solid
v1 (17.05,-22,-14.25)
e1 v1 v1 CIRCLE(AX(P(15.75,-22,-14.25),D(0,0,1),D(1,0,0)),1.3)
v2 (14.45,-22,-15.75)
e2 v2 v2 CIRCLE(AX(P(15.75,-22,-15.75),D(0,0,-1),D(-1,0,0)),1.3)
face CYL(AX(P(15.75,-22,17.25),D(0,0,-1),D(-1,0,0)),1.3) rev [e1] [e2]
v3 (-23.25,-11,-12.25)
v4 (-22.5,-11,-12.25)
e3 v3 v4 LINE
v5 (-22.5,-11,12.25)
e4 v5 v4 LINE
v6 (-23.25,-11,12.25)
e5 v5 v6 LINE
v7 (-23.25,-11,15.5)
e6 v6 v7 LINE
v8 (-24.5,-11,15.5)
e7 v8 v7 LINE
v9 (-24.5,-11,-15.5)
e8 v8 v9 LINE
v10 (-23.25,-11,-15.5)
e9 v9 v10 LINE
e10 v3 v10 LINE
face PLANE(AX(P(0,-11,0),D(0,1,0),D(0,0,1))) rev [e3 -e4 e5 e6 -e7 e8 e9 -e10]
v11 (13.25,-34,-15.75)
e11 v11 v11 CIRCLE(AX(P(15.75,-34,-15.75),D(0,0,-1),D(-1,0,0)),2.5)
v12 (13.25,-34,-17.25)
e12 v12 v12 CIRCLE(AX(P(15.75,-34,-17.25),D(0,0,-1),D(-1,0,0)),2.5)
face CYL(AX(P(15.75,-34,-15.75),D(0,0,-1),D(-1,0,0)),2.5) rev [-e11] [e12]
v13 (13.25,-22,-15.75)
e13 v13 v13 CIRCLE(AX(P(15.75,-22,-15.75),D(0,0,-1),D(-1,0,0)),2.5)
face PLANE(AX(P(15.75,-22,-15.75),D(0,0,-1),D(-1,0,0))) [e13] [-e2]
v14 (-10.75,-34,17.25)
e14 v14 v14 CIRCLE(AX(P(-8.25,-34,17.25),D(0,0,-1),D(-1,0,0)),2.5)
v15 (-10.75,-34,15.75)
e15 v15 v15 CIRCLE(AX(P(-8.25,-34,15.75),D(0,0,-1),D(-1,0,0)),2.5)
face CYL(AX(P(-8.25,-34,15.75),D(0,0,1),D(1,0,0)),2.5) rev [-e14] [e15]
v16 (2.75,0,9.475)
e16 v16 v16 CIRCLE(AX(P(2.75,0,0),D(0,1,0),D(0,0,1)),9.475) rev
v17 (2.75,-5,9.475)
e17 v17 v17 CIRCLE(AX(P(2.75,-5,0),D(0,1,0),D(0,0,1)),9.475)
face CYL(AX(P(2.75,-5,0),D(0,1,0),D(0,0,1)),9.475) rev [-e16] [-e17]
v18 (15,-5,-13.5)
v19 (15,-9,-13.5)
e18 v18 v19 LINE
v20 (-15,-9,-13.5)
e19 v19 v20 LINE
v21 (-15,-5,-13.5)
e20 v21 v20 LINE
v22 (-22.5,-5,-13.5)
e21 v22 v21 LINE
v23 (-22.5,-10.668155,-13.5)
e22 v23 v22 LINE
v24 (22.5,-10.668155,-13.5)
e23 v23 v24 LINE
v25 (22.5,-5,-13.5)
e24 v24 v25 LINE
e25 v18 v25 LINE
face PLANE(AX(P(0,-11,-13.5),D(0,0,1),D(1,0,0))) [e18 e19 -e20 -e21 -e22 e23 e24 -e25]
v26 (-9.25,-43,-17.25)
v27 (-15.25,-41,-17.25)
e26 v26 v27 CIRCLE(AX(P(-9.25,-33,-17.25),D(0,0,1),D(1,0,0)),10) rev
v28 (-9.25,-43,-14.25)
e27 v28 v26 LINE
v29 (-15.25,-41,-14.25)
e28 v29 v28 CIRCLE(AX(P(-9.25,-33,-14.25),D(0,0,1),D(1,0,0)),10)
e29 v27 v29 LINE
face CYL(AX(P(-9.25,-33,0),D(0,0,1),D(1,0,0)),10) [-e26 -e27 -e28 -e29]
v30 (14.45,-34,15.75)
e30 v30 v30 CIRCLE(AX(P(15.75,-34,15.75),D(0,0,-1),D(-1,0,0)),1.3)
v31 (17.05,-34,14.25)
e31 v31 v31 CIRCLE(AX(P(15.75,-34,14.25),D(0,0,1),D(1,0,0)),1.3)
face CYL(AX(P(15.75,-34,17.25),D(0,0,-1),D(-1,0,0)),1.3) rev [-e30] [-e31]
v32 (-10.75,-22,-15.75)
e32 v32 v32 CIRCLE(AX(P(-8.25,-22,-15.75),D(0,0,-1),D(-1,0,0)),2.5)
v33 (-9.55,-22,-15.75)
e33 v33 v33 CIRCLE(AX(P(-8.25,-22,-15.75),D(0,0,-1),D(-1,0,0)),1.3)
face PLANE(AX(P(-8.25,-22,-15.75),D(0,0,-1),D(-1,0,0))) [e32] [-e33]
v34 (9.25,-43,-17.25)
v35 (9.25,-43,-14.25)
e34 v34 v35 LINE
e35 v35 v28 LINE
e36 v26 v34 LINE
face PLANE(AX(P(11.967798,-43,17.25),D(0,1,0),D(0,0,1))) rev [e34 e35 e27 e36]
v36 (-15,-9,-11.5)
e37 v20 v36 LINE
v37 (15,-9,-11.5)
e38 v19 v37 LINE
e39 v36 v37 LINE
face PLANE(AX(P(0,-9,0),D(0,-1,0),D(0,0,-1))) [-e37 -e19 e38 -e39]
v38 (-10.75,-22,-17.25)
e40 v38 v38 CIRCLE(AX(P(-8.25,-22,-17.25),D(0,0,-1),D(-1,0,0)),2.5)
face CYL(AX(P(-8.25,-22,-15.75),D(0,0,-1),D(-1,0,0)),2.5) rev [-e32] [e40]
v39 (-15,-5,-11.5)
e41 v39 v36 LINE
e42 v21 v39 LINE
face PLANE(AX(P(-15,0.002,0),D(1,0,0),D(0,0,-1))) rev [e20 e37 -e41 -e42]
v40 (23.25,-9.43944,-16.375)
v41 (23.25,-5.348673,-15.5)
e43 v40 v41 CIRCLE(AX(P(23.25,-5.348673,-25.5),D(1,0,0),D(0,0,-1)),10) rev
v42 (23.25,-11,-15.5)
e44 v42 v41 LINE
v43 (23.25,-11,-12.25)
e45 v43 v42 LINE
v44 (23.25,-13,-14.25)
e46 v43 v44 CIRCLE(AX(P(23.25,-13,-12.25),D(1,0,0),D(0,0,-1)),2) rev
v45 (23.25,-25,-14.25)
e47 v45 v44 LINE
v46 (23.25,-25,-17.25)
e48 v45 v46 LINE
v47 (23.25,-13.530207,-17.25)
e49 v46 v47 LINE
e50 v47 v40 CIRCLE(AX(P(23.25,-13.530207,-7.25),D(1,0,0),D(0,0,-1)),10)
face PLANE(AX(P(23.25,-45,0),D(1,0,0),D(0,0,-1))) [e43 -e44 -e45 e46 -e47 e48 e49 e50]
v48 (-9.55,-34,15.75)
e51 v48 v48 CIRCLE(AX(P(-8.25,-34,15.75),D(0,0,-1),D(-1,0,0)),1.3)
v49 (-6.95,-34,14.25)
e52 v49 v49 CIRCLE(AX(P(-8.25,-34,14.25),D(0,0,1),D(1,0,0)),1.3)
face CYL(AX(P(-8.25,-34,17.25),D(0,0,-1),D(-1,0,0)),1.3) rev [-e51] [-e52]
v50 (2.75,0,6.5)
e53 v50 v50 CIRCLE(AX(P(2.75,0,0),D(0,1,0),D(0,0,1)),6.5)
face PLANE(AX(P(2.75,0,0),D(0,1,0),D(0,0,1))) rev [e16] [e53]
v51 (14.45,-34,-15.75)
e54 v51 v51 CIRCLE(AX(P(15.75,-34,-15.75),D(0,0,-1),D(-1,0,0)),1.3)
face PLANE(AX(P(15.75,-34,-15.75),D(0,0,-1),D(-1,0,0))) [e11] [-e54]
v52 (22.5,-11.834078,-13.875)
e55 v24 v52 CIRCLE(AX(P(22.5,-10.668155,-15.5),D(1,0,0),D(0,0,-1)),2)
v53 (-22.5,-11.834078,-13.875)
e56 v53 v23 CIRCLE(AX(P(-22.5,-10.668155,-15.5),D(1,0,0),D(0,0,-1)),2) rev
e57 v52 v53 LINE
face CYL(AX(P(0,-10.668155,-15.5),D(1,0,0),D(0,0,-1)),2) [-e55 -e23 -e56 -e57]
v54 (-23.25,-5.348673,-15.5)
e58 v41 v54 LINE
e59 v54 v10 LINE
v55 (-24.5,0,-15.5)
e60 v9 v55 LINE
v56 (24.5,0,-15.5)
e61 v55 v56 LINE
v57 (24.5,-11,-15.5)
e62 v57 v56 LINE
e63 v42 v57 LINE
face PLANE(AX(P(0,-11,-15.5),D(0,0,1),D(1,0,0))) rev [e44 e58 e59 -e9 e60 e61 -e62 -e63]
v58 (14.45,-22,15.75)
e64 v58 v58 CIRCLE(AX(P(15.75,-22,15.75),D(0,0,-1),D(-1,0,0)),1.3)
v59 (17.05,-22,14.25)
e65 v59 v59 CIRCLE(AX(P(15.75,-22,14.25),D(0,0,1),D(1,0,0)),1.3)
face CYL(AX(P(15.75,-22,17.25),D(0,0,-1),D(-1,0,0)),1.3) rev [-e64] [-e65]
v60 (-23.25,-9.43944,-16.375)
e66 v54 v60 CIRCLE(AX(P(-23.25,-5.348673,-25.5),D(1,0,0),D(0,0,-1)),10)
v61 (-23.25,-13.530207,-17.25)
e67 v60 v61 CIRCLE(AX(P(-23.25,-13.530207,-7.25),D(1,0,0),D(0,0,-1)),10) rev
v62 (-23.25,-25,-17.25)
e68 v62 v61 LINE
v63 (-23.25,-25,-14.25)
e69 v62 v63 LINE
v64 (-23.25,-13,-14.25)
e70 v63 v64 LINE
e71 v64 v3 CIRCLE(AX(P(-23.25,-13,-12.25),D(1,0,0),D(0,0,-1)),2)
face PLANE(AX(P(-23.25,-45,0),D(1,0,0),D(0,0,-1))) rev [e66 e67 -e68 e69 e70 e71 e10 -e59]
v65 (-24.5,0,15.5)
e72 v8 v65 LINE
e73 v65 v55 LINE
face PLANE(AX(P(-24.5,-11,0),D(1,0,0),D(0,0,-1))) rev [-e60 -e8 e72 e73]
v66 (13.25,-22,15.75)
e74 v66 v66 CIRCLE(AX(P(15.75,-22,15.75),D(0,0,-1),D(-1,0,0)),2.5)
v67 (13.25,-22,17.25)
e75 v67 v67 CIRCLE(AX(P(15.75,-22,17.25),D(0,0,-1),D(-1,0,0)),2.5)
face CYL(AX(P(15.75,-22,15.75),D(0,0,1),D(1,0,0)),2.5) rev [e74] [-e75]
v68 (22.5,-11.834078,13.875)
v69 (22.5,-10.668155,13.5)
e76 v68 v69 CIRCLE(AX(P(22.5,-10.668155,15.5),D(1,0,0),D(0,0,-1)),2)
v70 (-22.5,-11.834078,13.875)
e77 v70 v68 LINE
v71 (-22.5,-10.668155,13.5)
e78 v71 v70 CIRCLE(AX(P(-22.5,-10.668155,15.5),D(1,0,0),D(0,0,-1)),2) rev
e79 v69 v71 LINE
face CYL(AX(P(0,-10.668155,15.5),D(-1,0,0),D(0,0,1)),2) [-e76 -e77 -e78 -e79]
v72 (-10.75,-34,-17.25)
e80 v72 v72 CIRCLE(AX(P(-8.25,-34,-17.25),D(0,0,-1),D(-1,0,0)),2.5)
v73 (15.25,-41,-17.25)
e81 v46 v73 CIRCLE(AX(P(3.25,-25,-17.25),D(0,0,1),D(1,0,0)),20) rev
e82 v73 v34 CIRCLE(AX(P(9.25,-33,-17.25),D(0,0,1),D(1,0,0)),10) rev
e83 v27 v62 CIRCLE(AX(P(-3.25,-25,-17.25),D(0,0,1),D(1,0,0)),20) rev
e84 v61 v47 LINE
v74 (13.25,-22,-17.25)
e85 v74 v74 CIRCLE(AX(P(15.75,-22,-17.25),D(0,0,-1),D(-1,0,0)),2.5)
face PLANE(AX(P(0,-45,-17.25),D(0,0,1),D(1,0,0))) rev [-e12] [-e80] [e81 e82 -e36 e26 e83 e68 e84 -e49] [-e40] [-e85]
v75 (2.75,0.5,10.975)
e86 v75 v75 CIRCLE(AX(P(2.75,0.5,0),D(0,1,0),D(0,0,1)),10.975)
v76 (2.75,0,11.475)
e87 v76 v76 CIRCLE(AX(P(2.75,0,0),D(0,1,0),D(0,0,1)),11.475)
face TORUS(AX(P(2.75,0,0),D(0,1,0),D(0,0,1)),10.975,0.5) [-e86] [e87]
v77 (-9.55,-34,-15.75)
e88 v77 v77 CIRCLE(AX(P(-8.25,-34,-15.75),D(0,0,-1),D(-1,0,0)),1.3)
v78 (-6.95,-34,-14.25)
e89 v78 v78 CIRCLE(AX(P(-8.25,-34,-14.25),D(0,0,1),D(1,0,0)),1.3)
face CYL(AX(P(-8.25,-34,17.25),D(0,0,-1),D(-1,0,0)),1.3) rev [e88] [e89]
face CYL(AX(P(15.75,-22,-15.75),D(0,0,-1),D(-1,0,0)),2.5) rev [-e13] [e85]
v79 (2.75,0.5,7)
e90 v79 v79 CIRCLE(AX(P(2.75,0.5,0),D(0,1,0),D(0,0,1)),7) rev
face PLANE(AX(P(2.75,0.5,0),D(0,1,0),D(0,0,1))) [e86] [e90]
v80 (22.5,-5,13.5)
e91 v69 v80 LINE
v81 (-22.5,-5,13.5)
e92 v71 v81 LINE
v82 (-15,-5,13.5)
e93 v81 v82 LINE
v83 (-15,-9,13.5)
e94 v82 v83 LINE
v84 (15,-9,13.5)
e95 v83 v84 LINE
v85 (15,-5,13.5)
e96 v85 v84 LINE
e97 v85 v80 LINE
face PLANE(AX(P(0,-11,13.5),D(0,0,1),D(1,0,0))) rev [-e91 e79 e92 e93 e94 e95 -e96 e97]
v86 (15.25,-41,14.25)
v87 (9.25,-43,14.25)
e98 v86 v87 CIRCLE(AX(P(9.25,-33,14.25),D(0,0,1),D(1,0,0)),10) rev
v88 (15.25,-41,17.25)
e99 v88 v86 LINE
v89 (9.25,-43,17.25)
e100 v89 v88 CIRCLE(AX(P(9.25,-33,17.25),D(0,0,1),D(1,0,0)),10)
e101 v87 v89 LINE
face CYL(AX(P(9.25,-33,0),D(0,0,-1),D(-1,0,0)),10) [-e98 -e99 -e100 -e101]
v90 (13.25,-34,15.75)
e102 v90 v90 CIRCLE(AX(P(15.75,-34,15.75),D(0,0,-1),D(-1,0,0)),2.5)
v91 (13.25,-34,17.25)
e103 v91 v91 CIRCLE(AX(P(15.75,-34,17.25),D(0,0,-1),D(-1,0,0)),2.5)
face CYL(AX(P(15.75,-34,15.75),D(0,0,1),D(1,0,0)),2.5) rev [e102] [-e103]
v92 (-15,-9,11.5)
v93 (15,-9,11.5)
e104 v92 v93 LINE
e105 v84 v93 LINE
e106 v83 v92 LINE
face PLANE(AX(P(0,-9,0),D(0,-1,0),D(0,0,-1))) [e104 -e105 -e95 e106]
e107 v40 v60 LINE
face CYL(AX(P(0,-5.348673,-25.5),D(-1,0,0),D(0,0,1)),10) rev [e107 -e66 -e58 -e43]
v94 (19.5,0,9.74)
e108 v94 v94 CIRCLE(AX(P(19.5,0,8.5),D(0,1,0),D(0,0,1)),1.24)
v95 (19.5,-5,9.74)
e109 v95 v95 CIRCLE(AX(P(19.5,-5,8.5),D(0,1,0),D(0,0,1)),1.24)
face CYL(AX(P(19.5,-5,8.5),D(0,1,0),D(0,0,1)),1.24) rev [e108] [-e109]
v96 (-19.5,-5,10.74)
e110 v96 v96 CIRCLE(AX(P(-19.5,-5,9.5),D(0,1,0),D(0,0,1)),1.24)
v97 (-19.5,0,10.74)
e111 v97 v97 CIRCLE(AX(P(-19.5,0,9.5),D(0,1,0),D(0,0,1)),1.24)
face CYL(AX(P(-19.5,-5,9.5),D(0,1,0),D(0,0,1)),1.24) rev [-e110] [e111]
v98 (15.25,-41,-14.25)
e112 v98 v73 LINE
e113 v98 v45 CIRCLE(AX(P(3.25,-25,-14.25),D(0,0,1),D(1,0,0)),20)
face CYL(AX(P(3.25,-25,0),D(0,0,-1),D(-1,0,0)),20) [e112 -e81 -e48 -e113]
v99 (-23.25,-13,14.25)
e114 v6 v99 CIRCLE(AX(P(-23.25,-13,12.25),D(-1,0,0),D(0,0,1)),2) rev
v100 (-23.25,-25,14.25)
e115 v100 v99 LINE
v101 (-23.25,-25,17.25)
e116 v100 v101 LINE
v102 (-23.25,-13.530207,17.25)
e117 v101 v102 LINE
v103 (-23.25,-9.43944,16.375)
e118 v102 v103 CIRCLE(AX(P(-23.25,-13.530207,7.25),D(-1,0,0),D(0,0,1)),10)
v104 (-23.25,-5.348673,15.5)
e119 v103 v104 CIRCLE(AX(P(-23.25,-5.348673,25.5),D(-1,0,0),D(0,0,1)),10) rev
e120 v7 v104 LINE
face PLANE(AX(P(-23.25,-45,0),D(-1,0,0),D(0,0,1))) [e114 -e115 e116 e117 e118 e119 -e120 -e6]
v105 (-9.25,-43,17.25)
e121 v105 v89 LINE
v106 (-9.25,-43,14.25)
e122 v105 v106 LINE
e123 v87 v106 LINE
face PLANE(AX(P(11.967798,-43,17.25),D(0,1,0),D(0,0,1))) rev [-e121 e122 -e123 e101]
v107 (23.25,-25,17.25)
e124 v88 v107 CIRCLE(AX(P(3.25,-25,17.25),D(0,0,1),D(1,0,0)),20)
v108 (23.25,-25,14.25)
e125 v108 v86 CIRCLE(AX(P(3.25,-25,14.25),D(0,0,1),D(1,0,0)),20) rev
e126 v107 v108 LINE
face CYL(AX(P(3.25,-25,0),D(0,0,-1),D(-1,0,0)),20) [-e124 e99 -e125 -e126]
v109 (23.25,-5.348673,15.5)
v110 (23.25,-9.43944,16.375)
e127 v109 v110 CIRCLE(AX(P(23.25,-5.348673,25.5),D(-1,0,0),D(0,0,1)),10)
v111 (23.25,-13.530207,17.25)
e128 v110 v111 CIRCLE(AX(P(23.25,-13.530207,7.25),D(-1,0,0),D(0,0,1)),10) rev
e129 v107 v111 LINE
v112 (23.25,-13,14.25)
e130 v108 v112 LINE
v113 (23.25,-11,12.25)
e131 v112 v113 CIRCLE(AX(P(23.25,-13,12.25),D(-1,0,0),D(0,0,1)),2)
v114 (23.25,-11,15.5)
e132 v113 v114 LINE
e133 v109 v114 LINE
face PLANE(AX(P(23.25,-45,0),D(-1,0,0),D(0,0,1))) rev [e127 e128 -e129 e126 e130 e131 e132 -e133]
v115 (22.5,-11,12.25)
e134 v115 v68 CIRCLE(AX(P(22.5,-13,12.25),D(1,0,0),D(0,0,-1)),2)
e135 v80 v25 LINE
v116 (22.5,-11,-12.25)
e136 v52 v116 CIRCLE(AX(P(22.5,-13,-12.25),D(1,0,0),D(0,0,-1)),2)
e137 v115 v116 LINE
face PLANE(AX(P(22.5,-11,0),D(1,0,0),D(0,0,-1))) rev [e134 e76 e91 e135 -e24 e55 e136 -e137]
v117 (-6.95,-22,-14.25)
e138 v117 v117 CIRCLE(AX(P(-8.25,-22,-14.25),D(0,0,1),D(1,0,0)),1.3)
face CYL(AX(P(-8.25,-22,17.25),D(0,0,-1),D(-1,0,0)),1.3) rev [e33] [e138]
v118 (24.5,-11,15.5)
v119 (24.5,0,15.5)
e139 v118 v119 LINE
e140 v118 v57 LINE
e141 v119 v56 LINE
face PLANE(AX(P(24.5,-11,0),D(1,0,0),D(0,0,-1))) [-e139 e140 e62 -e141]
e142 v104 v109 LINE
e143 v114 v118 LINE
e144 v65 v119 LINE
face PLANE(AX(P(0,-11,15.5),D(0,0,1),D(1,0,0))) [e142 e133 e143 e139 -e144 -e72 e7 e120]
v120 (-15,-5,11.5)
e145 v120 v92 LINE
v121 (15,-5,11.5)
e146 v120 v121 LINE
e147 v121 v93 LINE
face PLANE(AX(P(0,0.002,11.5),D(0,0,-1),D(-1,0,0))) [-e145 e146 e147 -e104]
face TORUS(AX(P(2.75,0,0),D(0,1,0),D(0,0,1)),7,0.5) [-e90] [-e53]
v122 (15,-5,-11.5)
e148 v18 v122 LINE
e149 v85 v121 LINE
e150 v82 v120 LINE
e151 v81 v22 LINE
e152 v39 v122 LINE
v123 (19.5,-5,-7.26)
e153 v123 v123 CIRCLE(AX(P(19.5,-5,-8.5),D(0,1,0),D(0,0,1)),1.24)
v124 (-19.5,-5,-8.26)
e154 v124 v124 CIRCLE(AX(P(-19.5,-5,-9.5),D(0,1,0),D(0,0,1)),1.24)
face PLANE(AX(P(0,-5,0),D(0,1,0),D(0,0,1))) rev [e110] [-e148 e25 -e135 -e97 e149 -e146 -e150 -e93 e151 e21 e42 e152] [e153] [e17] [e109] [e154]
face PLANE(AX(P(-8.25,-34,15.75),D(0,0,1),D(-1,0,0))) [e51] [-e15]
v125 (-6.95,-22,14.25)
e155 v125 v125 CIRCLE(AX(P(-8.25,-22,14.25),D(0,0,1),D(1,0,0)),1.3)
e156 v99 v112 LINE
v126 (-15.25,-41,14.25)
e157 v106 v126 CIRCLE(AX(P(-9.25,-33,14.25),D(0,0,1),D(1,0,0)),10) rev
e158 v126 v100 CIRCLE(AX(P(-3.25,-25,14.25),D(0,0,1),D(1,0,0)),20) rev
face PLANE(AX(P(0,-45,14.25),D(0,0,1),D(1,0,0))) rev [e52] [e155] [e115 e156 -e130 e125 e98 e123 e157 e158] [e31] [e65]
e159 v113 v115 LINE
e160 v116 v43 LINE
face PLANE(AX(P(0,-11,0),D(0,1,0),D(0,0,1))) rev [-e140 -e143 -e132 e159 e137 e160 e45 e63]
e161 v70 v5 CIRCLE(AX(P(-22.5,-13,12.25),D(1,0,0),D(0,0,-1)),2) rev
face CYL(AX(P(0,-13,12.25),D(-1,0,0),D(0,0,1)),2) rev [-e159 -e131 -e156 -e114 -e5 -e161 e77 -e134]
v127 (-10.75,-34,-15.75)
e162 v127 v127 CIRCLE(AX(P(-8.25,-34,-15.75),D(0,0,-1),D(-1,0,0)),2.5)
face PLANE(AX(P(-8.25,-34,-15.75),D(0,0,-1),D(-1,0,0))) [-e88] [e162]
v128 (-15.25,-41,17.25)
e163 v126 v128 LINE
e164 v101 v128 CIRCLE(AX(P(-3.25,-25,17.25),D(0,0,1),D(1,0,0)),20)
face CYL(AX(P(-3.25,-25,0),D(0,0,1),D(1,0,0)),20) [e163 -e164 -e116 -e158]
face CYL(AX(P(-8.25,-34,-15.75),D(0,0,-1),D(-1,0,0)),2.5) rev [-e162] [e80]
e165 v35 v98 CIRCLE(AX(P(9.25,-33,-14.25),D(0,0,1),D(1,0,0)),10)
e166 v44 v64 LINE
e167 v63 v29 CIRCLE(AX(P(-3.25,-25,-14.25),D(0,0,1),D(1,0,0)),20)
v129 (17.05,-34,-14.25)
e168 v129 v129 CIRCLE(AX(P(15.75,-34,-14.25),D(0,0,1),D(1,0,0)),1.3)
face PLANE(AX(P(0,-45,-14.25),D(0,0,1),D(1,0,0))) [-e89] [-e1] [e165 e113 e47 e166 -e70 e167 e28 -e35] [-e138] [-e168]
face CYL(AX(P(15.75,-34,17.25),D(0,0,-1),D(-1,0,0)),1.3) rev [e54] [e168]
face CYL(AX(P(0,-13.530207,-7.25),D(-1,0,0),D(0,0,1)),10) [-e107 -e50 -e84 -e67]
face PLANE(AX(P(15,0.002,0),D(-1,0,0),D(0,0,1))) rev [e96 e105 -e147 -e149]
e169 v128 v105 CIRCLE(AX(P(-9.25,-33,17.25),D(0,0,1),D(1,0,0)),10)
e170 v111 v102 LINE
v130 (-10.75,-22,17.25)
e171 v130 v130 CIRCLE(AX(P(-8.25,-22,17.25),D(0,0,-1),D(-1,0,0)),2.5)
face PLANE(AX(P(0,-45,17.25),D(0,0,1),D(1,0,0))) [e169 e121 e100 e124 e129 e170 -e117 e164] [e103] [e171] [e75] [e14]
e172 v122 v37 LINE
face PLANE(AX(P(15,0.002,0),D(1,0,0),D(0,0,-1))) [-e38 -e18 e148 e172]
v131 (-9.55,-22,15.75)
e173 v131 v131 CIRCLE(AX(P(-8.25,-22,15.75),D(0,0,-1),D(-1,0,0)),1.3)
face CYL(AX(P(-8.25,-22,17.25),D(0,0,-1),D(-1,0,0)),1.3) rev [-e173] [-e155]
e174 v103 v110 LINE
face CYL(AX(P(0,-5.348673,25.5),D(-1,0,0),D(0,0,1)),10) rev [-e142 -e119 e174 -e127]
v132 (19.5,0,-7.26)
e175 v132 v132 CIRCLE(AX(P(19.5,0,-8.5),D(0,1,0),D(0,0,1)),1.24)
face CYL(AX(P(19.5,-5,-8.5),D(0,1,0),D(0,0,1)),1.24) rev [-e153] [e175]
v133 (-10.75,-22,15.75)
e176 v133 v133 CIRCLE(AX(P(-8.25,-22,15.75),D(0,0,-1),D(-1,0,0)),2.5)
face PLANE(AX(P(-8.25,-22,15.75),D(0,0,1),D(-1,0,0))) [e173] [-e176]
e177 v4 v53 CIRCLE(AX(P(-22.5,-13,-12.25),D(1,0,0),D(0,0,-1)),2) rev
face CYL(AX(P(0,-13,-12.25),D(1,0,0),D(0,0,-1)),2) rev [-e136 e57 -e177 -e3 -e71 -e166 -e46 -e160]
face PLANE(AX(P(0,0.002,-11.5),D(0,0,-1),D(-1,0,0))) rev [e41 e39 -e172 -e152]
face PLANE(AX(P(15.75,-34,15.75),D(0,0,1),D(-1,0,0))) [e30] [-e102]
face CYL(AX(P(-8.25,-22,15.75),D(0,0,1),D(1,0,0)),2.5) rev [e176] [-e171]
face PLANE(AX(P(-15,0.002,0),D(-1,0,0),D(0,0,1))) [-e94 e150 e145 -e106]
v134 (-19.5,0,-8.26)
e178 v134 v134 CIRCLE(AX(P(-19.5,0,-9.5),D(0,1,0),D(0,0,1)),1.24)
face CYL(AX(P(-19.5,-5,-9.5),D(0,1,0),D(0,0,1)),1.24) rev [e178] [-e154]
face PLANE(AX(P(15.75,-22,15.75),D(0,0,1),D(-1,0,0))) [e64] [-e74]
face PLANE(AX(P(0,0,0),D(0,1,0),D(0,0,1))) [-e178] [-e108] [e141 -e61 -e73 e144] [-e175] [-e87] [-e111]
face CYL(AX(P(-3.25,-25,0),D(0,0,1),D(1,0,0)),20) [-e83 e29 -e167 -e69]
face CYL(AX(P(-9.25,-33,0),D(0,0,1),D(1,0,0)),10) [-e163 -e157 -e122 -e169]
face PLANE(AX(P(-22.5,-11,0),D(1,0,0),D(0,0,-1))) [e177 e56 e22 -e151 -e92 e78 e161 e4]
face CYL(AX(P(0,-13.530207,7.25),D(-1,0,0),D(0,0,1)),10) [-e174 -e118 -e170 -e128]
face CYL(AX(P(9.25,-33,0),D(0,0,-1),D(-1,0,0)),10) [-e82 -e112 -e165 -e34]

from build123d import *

# Parameters (mm, degrees)
SKETCH1_W           = 45
SKETCH1_H           = 27
SKETCH1_R           = 9.475
SKETCH1_R_2         = 1.24
BOSS_EXTRUDE1_DEPTH = 5
SKETCH1_3_W         = 49
SKETCH1_3_H         = 31
SKETCH1_3_W_2       = 45
SKETCH1_3_H_2       = 27
BOSS_EXTRUDE2_DEPTH = 11
SKETCH2_W           = 46.5
SKETCH2_H           = 1.75
SKETCH2_H_2         = 1.25
BOSS_EXTRUDE3_DEPTH = 34
BOSS_EXTRUDE4_REACH = 49.319
BOSS_EXTRUDE4_START = -2
SKETCH2_4_W         = 30
SKETCH2_4_H         = 2
SKETCH3_R           = 1.3
CUT_EXTRUDE2_DEPTH  = 62.769733689
SKETCH3_3_R         = 2.5
SKETCH3_3_R_2       = 1.3
CUT_EXTRUDE3_DEPTH  = 1.5
FILLET3_R           = 10
FILLET4_R           = 10
FILLET5_R           = 2
FILLET6_R           = 2
FILLET7_R           = 20
SKETCH4_R           = 11.475
SKETCH4_R_2         = 6.5
BOSS_EXTRUDE5_DEPTH = 0.5
FILLET8_R           = 0.5
CUT_EXTRUDE4_DEPTH  = 62.769733689
FILLET9_R           = 10


# Some blends are built 0.0001 mm under size
with BuildPart() as part:
    # Sketch1 → Boss-Extrude1 (new body)
    with BuildSketch(Plane(origin=(0, 0, 0), x_dir=(1, 0, 0), z_dir=(0, 1, 0))):
        Rectangle(SKETCH1_W, SKETCH1_H)
        with Locations(Location((2.75, 0, 0), (0, 0, 270))):
            Circle(SKETCH1_R, mode=Mode.SUBTRACT)
        with Locations(Location((-19.5, 9.5, 0), (0, 0, 270))):
            Circle(SKETCH1_R_2, mode=Mode.SUBTRACT)
        with Locations(Location((-19.5, -9.5, 0), (0, 0, 270))):
            Circle(SKETCH1_R_2, mode=Mode.SUBTRACT)
        with Locations(Location((19.5, -8.5, 0), (0, 0, 270))):
            Circle(SKETCH1_R_2, mode=Mode.SUBTRACT)
        with Locations(Location((19.5, 8.5, 0), (0, 0, 270))):
            Circle(SKETCH1_R_2, mode=Mode.SUBTRACT)
    extrude(amount=-BOSS_EXTRUDE1_DEPTH)

    # Sketch1<3> → Boss-Extrude2 (add)
    with BuildSketch(Plane(origin=(0, 0, 0), x_dir=(1, 0, 0), z_dir=(0, 1, 0))):
        Rectangle(SKETCH1_3_W, SKETCH1_3_H)
        Rectangle(SKETCH1_3_W_2, SKETCH1_3_H_2, mode=Mode.SUBTRACT)
    extrude(amount=-BOSS_EXTRUDE2_DEPTH)

    # Sketch2 → Boss-Extrude3 (add)
    with BuildSketch(Plane.XZ.offset(11)):
        with Locations((0, 16.375)):
            Rectangle(SKETCH2_W, SKETCH2_H)
        with Locations((0, 14.875)):
            Rectangle(SKETCH2_W, SKETCH2_H_2)
        with Locations((0, -14.875)):
            Rectangle(SKETCH2_W, SKETCH2_H_2)
        with Locations((0, -16.375)):
            Rectangle(SKETCH2_W, SKETCH2_H)
    extrude(amount=BOSS_EXTRUDE3_DEPTH)

    # Sketch2<4> → Boss-Extrude4 (add, up to next)
    with BuildSketch(Plane.XZ.offset(11).offset(BOSS_EXTRUDE4_START), mode=Mode.PRIVATE) as boss_extrude4_sk1:
        with Locations((0, 12.5)):
            Rectangle(SKETCH2_4_W, SKETCH2_4_H)
    boss_extrude4_tool1 = extrude(boss_extrude4_sk1.sketch, amount=-BOSS_EXTRUDE4_REACH, mode=Mode.PRIVATE) - part.part
    # Sketch2<4> → Boss-Extrude4 (add, up to next)
    with BuildSketch(Plane.XZ.offset(11).offset(BOSS_EXTRUDE4_START), mode=Mode.PRIVATE) as boss_extrude4_sk2:
        with Locations((0, -12.5)):
            Rectangle(SKETCH2_4_W, SKETCH2_4_H)
    boss_extrude4_tool2 = extrude(boss_extrude4_sk2.sketch, amount=-BOSS_EXTRUDE4_REACH, mode=Mode.PRIVATE) - part.part
    add(boss_extrude4_tool1.solids().sort_by_distance((0, -9, 12.5))[0])
    add(boss_extrude4_tool2.solids().sort_by_distance((0, -9, -12.5))[0])

    # Sketch3 → Cut-Extrude2 (cut, through all)
    with BuildSketch(Plane(origin=(0, 0, -17.25), x_dir=(-1, 0, 0), z_dir=(0, 0, -1))):
        with Locations((-15.75, -22)):
            Circle(SKETCH3_R)
        with Locations((8.25, -22)):
            Circle(SKETCH3_R)
        with Locations((8.25, -34)):
            Circle(SKETCH3_R)
        with Locations((-15.75, -34)):
            Circle(SKETCH3_R)
    extrude(amount=-CUT_EXTRUDE2_DEPTH, mode=Mode.SUBTRACT)

    # Sketch3<3> → Cut-Extrude3 (cut)
    # profile 1 of 4: a face of its own
    with BuildSketch(Plane(origin=(0, 0, -17.25), x_dir=(-1, 0, 0), z_dir=(0, 0, -1))):
        with Locations((-15.75, -22)):
            Circle(SKETCH3_3_R)
        with Locations((-15.75, -22)):
            Circle(SKETCH3_3_R_2, mode=Mode.SUBTRACT)
    # profile 2 of 4: a face of its own
    with BuildSketch(Plane(origin=(0, 0, -17.25), x_dir=(-1, 0, 0), z_dir=(0, 0, -1))):
        with Locations((-15.75, -34)):
            Circle(SKETCH3_3_R)
        with Locations((-15.75, -34)):
            Circle(SKETCH3_3_R_2, mode=Mode.SUBTRACT)
    # profile 3 of 4: a face of its own
    with BuildSketch(Plane(origin=(0, 0, -17.25), x_dir=(-1, 0, 0), z_dir=(0, 0, -1))):
        with Locations((8.25, -34)):
            Circle(SKETCH3_3_R)
        with Locations((8.25, -34)):
            Circle(SKETCH3_3_R_2, mode=Mode.SUBTRACT)
    # profile 4 of 4: a face of its own
    with BuildSketch(Plane(origin=(0, 0, -17.25), x_dir=(-1, 0, 0), z_dir=(0, 0, -1))):
        with Locations((8.25, -22)):
            Circle(SKETCH3_3_R)
        with Locations((8.25, -22)):
            Circle(SKETCH3_3_R_2, mode=Mode.SUBTRACT)
    cut_extrude3 = extrude(amount=-CUT_EXTRUDE3_DEPTH, mode=Mode.SUBTRACT)

    # Mirror1: Cut-Extrude3 across plane
    add(cut_extrude3.mirror(Plane.XY), mode=Mode.SUBTRACT)

    # Fillet3
    # the kernel refuses this fillet: 10 mm, written as the material it adds along each edge
    with BuildSketch(Plane(origin=(-23.25, -11, -15.5), x_dir=(0, 1, 0), z_dir=(1, 0, 0)), Plane(origin=(23.25, -11, 15.5), x_dir=(0, 1, 0), z_dir=(-1, 0, 0))) as fillet3_piece_1:
        with BuildLine():
            CenterArc((5.651327278, -10), FILLET3_R, 90, 34.41150867)
            Line((0, -1.75), (0, 0))
            Line((0, 0), (5.651327278, 0))
        make_face()
    extrude(amount=46.5)

    # Fillet4
    fillet4_edges = [part.edges().sort_by_distance(p)[0] for p in [
        (0, -11, 17.25),
        (0, -11, -17.25),
    ]]
    fillet(fillet4_edges, radius=FILLET4_R)

    # Fillet5
    # the kernel refuses this fillet: 2 mm, written as the material it adds along each edge
    with BuildSketch(Plane(origin=(-23.25, -11, 14.25), x_dir=(0, 0, -1), z_dir=(1, 0, 0))) as fillet5_piece_1_section:
        with BuildLine():
            CenterArc((FILLET5_R, -FILLET5_R), FILLET5_R, 90, 90)
            Line((0, -FILLET5_R), (0, 0))
            Line((0, 0), (FILLET5_R, 0))
        make_face()
    fillet5_piece_1 = extrude(amount=51.5, mode=Mode.PRIVATE)
    fillet5_piece_1 = split(fillet5_piece_1, bisect_by=Plane(origin=(-22.5, -11.128717382, 13.194770831), z_dir=(-1, 0, 0)), keep=Keep.TOP, mode=Mode.PRIVATE)
    add(fillet5_piece_1)
    with BuildSketch(Plane(origin=(-28.25, -11, 14.25), x_dir=(0, 0, -1), z_dir=(1, 0, 0))) as fillet5_piece_2_section:
        with BuildLine():
            CenterArc((FILLET5_R, -FILLET5_R), FILLET5_R, 90, 90)
            Line((0, -FILLET5_R), (0, 0))
            Line((0, 0), (FILLET5_R, 0))
        make_face()
    fillet5_piece_2 = extrude(amount=51.5, mode=Mode.PRIVATE)
    fillet5_piece_2 = split(fillet5_piece_2, bisect_by=Plane(origin=(0, -11.527561527, 13.5), z_dir=(0, 0, 1)), keep=Keep.TOP, mode=Mode.PRIVATE)
    fillet5_piece_2 = split(fillet5_piece_2, bisect_by=Plane(origin=(-22.5, -11.527561527, 13.95791508), z_dir=(1, 0, 0)), keep=Keep.TOP, mode=Mode.PRIVATE)
    add(fillet5_piece_2)
    with BuildSketch(Plane(origin=(-28.25, -11, 14.25), x_dir=(0, 0, -1), z_dir=(1, 0, 0))) as fillet5_piece_3_section:
        with BuildLine():
            CenterArc((FILLET5_R, -FILLET5_R), FILLET5_R, 90, 90)
            Line((0, -FILLET5_R), (0, 0))
            Line((0, 0), (FILLET5_R, 0))
        make_face()
    fillet5_piece_3 = extrude(amount=51.5, mode=Mode.PRIVATE)
    fillet5_piece_3 = split(fillet5_piece_3, bisect_by=Plane(origin=(22.5, -11.128717382, 13.194770831), z_dir=(1, 0, 0)), keep=Keep.TOP, mode=Mode.PRIVATE)
    add(fillet5_piece_3)
    with BuildSketch(Plane(origin=(23.25, -11, -14.25), x_dir=(0, 0, 1), z_dir=(-1, 0, 0))) as fillet5_piece_4_section:
        with BuildLine():
            CenterArc((FILLET5_R, -FILLET5_R), FILLET5_R, 90, 90)
            Line((0, -FILLET5_R), (0, 0))
            Line((0, 0), (FILLET5_R, 0))
        make_face()
    fillet5_piece_4 = extrude(amount=51.5, mode=Mode.PRIVATE)
    fillet5_piece_4 = split(fillet5_piece_4, bisect_by=Plane(origin=(22.5, -11.128717382, -13.194770831), z_dir=(1, 0, 0)), keep=Keep.TOP, mode=Mode.PRIVATE)
    add(fillet5_piece_4)
    with BuildSketch(Plane(origin=(28.25, -11, -14.25), x_dir=(0, 0, 1), z_dir=(-1, 0, 0))) as fillet5_piece_5_section:
        with BuildLine():
            CenterArc((FILLET5_R, -FILLET5_R), FILLET5_R, 90, 90)
            Line((0, -FILLET5_R), (0, 0))
            Line((0, 0), (FILLET5_R, 0))
        make_face()
    fillet5_piece_5 = extrude(amount=51.5, mode=Mode.PRIVATE)
    fillet5_piece_5 = split(fillet5_piece_5, bisect_by=Plane(origin=(22.5, -11.527561527, -13.95791508), z_dir=(-1, 0, 0)), keep=Keep.TOP, mode=Mode.PRIVATE)
    fillet5_piece_5 = split(fillet5_piece_5, bisect_by=Plane(origin=(0, -11.527561527, -13.5), z_dir=(0, 0, -1)), keep=Keep.TOP, mode=Mode.PRIVATE)
    add(fillet5_piece_5)
    with BuildSketch(Plane(origin=(28.25, -11, -14.25), x_dir=(0, 0, 1), z_dir=(-1, 0, 0))) as fillet5_piece_6_section:
        with BuildLine():
            CenterArc((FILLET5_R, -FILLET5_R), FILLET5_R, 90, 90)
            Line((0, -FILLET5_R), (0, 0))
            Line((0, 0), (FILLET5_R, 0))
        make_face()
    fillet5_piece_6 = extrude(amount=51.5, mode=Mode.PRIVATE)
    fillet5_piece_6 = split(fillet5_piece_6, bisect_by=Plane(origin=(-22.5, -11.128717382, -13.194770831), z_dir=(-1, 0, 0)), keep=Keep.TOP, mode=Mode.PRIVATE)
    add(fillet5_piece_6)

    # Fillet6
    fillet6_edges = [part.edges().sort_by_distance(p)[0] for p in [
        (0, -11.4387505, 13.5),
        (0, -11.4387505, -13.5),
    ]]
    fillet(fillet6_edges, radius=FILLET6_R)

    # Fillet7
    fillet7_edges = [part.edges().sort_by_distance(p)[0] for p in [
        (-23.25, -45, 15.75),
        (23.25, -45, 15.75),
        (23.25, -45, -15.75),
        (-23.25, -45, -15.75),
    ]]
    fillet(fillet7_edges, radius=FILLET7_R)

    # Sketch4 → Boss-Extrude5 (add)
    with BuildSketch(Plane(origin=(0, 0, 0), x_dir=(1, 0, 0), z_dir=(0, 1, 0))):
        with Locations(Location((2.75, 0, 0), (0, 0, 270))):
            Circle(SKETCH4_R)
        with Locations(Location((2.75, 0, 0), (0, 0, 270))):
            Circle(SKETCH4_R_2, mode=Mode.SUBTRACT)
    extrude(amount=BOSS_EXTRUDE5_DEPTH)

    # Fillet8
    fillet8_edges = [part.edges().sort_by_distance(p)[0] for p in [
        (2.75, 0.5, -11.475),
        (2.75, 0.5, -6.5),
    ]]
    fillet(fillet8_edges, radius=FILLET8_R - 0.0001)  # a hair under: the kernel refuses the full size

    # Sketch5 → Cut-Extrude4 (cut, through all)
    with BuildSketch(Plane(origin=(0, 0, -17.25), x_dir=(-1, 0, 0), z_dir=(0, 0, -1))):
        with BuildLine():
            Line((-11.967797887, -43), (11.967797887, -43))
            ThreePointArc((11.967797887, -43), (7.722135955, -44.49358869), (3.25, -45))
            Line((3.25, -45), (-3.25, -45))
            ThreePointArc((-3.25, -45), (-7.722135955, -44.49358869), (-11.967797887, -43))
        make_face()
    extrude(amount=-CUT_EXTRUDE4_DEPTH, mode=Mode.SUBTRACT)

    # Fillet9
    fillet9_edges = [part.edges().sort_by_distance(p)[0] for p in [
        (11.967797887, -43, -15.75),
        (-11.967797887, -43, 15.75),
        (11.967797887, -43, 15.75),
        (-11.967797887, -43, -15.75),
    ]]
    fillet(fillet9_edges, radius=FILLET9_R)


solid = part.part
